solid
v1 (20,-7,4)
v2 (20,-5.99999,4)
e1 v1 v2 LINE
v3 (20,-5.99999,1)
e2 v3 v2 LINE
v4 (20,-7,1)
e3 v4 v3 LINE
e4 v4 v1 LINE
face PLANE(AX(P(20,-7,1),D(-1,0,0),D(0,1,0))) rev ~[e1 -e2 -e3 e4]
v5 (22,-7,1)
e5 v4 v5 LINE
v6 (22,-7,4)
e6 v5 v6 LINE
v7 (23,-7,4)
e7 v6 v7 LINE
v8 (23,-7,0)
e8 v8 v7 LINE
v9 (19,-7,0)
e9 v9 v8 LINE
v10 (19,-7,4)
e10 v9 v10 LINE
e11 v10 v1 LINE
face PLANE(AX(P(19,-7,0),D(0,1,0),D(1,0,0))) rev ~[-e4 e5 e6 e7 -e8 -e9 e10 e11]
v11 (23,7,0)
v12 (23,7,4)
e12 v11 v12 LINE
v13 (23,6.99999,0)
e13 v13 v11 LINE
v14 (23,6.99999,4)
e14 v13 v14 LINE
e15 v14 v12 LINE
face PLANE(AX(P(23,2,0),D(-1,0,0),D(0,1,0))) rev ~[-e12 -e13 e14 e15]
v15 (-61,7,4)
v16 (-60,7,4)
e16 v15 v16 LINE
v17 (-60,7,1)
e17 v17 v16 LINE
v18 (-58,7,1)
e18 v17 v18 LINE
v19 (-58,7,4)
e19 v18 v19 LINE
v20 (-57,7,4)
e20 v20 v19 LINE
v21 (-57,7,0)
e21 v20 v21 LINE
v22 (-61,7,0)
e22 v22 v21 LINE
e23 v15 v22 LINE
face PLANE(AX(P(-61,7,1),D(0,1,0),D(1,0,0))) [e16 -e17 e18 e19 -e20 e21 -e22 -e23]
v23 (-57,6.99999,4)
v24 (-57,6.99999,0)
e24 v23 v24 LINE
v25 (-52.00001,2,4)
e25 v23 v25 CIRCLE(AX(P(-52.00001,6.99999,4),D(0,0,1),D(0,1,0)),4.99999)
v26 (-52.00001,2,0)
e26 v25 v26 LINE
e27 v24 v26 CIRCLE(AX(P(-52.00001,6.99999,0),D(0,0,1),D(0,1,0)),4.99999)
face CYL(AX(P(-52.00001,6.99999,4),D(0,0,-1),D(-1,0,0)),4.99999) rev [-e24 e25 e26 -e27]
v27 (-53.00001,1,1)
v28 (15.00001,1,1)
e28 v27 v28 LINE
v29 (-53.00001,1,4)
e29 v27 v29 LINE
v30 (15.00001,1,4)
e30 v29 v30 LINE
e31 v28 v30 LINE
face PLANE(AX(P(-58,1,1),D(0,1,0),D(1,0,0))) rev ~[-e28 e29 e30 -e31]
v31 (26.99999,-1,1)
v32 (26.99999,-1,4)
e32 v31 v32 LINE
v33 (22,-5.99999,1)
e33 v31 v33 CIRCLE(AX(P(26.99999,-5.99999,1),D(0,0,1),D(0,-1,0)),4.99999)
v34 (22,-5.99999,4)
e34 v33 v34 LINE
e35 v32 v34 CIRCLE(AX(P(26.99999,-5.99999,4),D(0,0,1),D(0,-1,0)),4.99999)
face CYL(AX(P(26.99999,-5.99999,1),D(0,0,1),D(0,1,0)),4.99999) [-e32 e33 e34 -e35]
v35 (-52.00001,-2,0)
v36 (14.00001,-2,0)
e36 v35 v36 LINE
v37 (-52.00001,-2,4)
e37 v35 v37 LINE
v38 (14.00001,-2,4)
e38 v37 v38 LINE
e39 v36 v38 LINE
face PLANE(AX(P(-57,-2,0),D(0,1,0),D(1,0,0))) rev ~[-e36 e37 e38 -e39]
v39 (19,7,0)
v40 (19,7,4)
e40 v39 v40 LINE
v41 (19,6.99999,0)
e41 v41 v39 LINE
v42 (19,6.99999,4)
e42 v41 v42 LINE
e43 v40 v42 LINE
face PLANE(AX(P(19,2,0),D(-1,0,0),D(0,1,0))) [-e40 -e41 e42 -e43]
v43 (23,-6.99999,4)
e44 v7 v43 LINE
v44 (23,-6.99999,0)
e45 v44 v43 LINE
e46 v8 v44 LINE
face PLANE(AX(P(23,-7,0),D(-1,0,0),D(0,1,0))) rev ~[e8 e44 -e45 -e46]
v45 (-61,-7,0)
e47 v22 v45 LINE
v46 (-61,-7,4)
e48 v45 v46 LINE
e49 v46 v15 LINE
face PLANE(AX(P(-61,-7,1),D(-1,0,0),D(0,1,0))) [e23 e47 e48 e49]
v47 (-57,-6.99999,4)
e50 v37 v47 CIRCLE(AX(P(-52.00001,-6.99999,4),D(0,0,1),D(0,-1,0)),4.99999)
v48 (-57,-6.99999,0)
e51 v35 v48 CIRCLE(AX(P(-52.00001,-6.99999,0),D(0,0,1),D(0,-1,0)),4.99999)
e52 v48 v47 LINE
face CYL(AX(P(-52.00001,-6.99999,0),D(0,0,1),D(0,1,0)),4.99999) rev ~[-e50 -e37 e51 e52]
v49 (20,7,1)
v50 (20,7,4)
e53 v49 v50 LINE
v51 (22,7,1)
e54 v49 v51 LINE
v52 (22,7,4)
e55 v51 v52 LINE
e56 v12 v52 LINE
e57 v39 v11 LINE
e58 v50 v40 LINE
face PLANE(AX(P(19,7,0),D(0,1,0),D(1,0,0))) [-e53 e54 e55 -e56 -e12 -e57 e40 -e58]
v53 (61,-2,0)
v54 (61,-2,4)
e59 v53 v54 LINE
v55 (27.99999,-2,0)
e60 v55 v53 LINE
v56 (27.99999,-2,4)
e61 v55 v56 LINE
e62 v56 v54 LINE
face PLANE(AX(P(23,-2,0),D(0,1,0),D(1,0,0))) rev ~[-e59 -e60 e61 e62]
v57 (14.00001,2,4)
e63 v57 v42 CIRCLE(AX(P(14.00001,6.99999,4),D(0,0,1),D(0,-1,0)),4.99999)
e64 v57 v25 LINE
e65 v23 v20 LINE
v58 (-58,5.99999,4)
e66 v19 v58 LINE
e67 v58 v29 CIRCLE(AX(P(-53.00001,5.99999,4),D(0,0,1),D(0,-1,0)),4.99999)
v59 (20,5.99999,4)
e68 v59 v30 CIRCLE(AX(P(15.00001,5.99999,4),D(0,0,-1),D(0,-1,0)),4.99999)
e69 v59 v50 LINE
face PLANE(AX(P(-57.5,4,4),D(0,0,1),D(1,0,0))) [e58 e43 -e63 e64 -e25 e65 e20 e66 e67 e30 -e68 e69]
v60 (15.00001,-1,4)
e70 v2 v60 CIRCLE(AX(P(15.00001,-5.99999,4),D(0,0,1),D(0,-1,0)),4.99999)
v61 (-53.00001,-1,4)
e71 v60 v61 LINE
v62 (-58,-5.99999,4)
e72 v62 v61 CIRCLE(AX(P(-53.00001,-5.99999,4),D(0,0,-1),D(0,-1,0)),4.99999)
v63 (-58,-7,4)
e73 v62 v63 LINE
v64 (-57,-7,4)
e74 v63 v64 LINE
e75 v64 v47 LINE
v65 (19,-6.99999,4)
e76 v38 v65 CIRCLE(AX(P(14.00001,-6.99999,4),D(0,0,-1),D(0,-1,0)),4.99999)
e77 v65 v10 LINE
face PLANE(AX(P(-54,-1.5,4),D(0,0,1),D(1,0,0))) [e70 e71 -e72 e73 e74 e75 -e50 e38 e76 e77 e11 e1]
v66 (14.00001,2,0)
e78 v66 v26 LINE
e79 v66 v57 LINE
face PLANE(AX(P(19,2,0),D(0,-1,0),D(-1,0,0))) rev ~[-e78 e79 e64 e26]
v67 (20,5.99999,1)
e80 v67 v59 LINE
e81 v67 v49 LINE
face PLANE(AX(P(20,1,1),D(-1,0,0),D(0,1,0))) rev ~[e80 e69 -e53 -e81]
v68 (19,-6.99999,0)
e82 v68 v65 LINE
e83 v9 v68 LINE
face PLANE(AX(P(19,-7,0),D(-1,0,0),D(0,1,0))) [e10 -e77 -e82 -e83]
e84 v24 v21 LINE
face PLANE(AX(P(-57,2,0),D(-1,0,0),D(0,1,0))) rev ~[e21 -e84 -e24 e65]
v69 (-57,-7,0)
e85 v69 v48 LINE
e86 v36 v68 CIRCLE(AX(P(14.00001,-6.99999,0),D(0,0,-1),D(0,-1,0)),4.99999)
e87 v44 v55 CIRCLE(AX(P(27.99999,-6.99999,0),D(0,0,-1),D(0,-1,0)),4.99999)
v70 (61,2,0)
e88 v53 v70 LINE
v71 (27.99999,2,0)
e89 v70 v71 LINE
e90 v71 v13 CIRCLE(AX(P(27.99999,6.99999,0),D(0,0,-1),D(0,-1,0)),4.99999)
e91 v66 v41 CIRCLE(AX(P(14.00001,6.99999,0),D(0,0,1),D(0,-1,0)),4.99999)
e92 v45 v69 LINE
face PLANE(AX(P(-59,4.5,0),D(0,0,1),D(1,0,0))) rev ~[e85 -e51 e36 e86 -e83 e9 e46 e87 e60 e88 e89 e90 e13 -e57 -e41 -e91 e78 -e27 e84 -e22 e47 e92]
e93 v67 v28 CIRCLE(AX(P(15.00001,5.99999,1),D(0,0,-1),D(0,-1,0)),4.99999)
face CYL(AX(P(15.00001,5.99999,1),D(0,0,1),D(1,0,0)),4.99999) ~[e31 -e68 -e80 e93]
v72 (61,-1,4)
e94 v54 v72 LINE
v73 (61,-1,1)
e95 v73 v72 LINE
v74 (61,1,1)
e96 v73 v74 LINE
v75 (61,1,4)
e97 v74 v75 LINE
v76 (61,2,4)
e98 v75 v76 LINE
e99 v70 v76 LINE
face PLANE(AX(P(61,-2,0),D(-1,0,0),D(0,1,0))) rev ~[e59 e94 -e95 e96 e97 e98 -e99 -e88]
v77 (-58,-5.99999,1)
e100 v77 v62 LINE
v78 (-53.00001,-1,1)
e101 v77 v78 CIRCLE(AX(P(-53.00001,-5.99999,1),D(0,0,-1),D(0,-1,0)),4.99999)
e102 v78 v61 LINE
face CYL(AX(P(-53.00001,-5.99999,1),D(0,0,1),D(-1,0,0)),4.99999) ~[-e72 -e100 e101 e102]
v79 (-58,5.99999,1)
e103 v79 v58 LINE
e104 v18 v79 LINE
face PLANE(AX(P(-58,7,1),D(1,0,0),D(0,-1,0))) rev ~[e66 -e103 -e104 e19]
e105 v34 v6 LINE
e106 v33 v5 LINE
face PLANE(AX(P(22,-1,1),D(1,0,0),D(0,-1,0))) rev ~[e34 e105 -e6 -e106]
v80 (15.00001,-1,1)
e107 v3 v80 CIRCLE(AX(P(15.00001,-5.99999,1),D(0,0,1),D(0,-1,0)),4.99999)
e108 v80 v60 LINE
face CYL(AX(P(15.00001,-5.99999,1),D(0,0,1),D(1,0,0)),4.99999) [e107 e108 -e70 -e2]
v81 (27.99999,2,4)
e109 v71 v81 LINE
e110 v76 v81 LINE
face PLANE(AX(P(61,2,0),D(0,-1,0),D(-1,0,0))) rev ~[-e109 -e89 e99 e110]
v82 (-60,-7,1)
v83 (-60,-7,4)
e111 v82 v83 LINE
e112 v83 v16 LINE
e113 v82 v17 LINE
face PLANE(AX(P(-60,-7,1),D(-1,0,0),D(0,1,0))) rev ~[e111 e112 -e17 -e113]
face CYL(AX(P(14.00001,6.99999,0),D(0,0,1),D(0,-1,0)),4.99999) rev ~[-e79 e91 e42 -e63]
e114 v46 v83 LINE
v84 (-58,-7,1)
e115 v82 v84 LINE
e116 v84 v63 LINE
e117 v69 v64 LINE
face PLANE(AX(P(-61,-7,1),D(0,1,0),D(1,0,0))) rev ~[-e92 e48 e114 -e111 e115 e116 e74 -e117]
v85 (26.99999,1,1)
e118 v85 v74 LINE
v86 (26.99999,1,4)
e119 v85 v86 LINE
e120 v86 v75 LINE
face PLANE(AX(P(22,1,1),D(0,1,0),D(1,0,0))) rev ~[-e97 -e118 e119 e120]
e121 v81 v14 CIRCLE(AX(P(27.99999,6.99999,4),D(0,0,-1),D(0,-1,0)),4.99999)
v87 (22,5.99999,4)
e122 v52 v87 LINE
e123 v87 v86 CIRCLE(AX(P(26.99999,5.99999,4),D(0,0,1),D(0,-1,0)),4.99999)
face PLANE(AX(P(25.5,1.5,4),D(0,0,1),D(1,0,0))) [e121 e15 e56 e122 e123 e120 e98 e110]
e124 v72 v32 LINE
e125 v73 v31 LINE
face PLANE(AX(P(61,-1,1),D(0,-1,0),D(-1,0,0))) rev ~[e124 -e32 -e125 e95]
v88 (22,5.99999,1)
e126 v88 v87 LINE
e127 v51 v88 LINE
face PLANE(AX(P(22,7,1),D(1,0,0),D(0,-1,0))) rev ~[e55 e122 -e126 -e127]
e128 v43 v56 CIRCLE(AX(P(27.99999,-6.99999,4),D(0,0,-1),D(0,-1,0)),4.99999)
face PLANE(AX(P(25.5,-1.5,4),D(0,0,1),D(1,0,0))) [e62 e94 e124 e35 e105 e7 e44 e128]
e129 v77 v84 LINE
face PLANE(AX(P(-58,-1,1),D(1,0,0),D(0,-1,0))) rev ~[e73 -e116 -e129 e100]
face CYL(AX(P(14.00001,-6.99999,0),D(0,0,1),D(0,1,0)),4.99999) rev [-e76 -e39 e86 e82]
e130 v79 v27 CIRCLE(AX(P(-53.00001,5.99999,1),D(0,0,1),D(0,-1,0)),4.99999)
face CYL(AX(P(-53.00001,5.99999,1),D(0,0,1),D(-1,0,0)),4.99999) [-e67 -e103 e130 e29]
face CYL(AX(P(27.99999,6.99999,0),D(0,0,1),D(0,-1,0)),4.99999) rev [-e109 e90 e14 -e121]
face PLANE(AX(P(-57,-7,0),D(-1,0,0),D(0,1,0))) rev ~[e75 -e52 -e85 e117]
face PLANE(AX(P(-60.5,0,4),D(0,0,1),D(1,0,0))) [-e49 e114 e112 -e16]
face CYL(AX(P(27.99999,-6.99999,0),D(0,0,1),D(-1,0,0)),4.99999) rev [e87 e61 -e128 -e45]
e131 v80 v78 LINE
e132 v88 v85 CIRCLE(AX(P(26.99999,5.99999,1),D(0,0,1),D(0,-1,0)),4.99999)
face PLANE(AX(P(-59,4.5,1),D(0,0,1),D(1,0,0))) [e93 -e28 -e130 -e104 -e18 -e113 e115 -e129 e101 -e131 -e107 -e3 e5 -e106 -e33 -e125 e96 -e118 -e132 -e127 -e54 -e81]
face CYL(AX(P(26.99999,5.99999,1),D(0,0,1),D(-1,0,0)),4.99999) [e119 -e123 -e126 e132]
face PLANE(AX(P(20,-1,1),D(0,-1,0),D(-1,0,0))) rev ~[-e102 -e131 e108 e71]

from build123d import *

# Parameters (mm, degrees)
F0_W     = 4
F0_H     = 5
F0_W_2   = 76
F0_H_2   = 2
F1_DEPTH = 1
F2_W     = 1
F2_H     = 14
F2_W_2   = 6
F2_H_2   = 1
F2_W_3   = 5
F2_W_4   = 33
F2_W_5   = 65
F3_DEPTH = 3
F4_R     = 4.99999
F5_R     = 4.99999


# Not quite as in the source:
# - a fillet or chamfer is up to 0.001 mm smaller than in the source, because OpenCascade refuses the exact size


with BuildPart() as f1:
    # F0 (on Top) → F1 (new body)
    with BuildSketch(Plane.XY):
        with Locations((-59, 4.5)):
            Rectangle(F0_W, F0_H)
        with Locations((-19, -1)):
            Rectangle(F0_W_2, F0_H_2)
        with Locations((-19, 1)):
            Rectangle(F0_W_2, F0_H_2)
        with Locations((-59, -1)):
            Rectangle(F0_W, F0_H_2)
        with Locations((-59, 1)):
            Rectangle(F0_W, F0_H_2)
        with Locations((-59, -4.5)):
            Rectangle(F0_W, F0_H)
        Polygon((61, 2), (23, 2), (23, 0), (23, -2), (61, -2), align=None)
        with Locations((21, 1)):
            Rectangle(F0_W, F0_H_2)
        with Locations((21, -1)):
            Rectangle(F0_W, F0_H_2)
        with Locations((21, 4.5)):
            Rectangle(F0_W, F0_H)
        with Locations((21, -4.5)):
            Rectangle(F0_W, F0_H)
    extrude(amount=F1_DEPTH)

    # F2 (on face) → F3 (join)
    with BuildSketch(Plane.XY.offset(1)):
        with Locations((-60.5, 0)):
            Rectangle(F2_W, F2_H)
        Polygon((-57, 7), (-58, 7), (-58, 1), (-57, 1), (-57, 2), align=None)
        with Locations((-54, 1.5)):
            Rectangle(F2_W_2, F2_H_2)
        with Locations((-54, -1.5)):
            Rectangle(F2_W_2, F2_H_2)
        Polygon((-58, -1), (-58, -7), (-57, -7), (-57, -2), (-57, -1), align=None)
        Polygon((19, -1), (19, -2), (19, -7), (20, -7), (20, -1), align=None)
        Polygon((19, 7), (19, 2), (19, 1), (20, 1), (20, 7), align=None)
        with Locations((16.5, 1.5)):
            Rectangle(F2_W_3, F2_H_2)
        with Locations((16.5, -1.5)):
            Rectangle(F2_W_3, F2_H_2)
        with Locations((25.5, -1.5)):
            Rectangle(F2_W_3, F2_H_2)
        with Locations((25.5, 1.5)):
            Rectangle(F2_W_3, F2_H_2)
        Polygon((23, 7), (22, 7), (22, 1), (23, 1), (23, 2), align=None)
        Polygon((22, -1), (22, -7), (23, -7), (23, -2), (23, -1), align=None)
        with Locations((44.5, -1.5)):
            Rectangle(F2_W_4, F2_H_2)
        with Locations((-18.5, 1.5)):
            Rectangle(F2_W_5, F2_H_2)
        with Locations((-18.5, -1.5)):
            Rectangle(F2_W_5, F2_H_2)
        with Locations((44.5, 1.5)):
            Rectangle(F2_W_4, F2_H_2)
    extrude(amount=F3_DEPTH)

    # F4 (radius 5 in the source; OpenCascade refuses exactly that, so slightly less here)
    f4_edges = [f1.edges().sort_by_distance(p)[0] for p in [
        (23, -2, 2),
        (20, -1, 2.5),
        (20, 1, 2.5),
        (22, 1, 2.5),
        (19, -2, 2),
        (22, -1, 2.5),
        (19, 2, 2),
        (23, 2, 2),
    ]]
    fillet(f4_edges, radius=F4_R)

    # F5 (radius 5 in the source; OpenCascade refuses exactly that, so slightly less here)
    f5_edges = [f1.edges().sort_by_distance(p)[0] for p in [
        (-57, -2, 2),
        (-58, 1, 2.5),
        (-57, 2, 2),
        (-58, -1, 2.5),
    ]]
    fillet(f5_edges, radius=F5_R)


solid = f1.part
